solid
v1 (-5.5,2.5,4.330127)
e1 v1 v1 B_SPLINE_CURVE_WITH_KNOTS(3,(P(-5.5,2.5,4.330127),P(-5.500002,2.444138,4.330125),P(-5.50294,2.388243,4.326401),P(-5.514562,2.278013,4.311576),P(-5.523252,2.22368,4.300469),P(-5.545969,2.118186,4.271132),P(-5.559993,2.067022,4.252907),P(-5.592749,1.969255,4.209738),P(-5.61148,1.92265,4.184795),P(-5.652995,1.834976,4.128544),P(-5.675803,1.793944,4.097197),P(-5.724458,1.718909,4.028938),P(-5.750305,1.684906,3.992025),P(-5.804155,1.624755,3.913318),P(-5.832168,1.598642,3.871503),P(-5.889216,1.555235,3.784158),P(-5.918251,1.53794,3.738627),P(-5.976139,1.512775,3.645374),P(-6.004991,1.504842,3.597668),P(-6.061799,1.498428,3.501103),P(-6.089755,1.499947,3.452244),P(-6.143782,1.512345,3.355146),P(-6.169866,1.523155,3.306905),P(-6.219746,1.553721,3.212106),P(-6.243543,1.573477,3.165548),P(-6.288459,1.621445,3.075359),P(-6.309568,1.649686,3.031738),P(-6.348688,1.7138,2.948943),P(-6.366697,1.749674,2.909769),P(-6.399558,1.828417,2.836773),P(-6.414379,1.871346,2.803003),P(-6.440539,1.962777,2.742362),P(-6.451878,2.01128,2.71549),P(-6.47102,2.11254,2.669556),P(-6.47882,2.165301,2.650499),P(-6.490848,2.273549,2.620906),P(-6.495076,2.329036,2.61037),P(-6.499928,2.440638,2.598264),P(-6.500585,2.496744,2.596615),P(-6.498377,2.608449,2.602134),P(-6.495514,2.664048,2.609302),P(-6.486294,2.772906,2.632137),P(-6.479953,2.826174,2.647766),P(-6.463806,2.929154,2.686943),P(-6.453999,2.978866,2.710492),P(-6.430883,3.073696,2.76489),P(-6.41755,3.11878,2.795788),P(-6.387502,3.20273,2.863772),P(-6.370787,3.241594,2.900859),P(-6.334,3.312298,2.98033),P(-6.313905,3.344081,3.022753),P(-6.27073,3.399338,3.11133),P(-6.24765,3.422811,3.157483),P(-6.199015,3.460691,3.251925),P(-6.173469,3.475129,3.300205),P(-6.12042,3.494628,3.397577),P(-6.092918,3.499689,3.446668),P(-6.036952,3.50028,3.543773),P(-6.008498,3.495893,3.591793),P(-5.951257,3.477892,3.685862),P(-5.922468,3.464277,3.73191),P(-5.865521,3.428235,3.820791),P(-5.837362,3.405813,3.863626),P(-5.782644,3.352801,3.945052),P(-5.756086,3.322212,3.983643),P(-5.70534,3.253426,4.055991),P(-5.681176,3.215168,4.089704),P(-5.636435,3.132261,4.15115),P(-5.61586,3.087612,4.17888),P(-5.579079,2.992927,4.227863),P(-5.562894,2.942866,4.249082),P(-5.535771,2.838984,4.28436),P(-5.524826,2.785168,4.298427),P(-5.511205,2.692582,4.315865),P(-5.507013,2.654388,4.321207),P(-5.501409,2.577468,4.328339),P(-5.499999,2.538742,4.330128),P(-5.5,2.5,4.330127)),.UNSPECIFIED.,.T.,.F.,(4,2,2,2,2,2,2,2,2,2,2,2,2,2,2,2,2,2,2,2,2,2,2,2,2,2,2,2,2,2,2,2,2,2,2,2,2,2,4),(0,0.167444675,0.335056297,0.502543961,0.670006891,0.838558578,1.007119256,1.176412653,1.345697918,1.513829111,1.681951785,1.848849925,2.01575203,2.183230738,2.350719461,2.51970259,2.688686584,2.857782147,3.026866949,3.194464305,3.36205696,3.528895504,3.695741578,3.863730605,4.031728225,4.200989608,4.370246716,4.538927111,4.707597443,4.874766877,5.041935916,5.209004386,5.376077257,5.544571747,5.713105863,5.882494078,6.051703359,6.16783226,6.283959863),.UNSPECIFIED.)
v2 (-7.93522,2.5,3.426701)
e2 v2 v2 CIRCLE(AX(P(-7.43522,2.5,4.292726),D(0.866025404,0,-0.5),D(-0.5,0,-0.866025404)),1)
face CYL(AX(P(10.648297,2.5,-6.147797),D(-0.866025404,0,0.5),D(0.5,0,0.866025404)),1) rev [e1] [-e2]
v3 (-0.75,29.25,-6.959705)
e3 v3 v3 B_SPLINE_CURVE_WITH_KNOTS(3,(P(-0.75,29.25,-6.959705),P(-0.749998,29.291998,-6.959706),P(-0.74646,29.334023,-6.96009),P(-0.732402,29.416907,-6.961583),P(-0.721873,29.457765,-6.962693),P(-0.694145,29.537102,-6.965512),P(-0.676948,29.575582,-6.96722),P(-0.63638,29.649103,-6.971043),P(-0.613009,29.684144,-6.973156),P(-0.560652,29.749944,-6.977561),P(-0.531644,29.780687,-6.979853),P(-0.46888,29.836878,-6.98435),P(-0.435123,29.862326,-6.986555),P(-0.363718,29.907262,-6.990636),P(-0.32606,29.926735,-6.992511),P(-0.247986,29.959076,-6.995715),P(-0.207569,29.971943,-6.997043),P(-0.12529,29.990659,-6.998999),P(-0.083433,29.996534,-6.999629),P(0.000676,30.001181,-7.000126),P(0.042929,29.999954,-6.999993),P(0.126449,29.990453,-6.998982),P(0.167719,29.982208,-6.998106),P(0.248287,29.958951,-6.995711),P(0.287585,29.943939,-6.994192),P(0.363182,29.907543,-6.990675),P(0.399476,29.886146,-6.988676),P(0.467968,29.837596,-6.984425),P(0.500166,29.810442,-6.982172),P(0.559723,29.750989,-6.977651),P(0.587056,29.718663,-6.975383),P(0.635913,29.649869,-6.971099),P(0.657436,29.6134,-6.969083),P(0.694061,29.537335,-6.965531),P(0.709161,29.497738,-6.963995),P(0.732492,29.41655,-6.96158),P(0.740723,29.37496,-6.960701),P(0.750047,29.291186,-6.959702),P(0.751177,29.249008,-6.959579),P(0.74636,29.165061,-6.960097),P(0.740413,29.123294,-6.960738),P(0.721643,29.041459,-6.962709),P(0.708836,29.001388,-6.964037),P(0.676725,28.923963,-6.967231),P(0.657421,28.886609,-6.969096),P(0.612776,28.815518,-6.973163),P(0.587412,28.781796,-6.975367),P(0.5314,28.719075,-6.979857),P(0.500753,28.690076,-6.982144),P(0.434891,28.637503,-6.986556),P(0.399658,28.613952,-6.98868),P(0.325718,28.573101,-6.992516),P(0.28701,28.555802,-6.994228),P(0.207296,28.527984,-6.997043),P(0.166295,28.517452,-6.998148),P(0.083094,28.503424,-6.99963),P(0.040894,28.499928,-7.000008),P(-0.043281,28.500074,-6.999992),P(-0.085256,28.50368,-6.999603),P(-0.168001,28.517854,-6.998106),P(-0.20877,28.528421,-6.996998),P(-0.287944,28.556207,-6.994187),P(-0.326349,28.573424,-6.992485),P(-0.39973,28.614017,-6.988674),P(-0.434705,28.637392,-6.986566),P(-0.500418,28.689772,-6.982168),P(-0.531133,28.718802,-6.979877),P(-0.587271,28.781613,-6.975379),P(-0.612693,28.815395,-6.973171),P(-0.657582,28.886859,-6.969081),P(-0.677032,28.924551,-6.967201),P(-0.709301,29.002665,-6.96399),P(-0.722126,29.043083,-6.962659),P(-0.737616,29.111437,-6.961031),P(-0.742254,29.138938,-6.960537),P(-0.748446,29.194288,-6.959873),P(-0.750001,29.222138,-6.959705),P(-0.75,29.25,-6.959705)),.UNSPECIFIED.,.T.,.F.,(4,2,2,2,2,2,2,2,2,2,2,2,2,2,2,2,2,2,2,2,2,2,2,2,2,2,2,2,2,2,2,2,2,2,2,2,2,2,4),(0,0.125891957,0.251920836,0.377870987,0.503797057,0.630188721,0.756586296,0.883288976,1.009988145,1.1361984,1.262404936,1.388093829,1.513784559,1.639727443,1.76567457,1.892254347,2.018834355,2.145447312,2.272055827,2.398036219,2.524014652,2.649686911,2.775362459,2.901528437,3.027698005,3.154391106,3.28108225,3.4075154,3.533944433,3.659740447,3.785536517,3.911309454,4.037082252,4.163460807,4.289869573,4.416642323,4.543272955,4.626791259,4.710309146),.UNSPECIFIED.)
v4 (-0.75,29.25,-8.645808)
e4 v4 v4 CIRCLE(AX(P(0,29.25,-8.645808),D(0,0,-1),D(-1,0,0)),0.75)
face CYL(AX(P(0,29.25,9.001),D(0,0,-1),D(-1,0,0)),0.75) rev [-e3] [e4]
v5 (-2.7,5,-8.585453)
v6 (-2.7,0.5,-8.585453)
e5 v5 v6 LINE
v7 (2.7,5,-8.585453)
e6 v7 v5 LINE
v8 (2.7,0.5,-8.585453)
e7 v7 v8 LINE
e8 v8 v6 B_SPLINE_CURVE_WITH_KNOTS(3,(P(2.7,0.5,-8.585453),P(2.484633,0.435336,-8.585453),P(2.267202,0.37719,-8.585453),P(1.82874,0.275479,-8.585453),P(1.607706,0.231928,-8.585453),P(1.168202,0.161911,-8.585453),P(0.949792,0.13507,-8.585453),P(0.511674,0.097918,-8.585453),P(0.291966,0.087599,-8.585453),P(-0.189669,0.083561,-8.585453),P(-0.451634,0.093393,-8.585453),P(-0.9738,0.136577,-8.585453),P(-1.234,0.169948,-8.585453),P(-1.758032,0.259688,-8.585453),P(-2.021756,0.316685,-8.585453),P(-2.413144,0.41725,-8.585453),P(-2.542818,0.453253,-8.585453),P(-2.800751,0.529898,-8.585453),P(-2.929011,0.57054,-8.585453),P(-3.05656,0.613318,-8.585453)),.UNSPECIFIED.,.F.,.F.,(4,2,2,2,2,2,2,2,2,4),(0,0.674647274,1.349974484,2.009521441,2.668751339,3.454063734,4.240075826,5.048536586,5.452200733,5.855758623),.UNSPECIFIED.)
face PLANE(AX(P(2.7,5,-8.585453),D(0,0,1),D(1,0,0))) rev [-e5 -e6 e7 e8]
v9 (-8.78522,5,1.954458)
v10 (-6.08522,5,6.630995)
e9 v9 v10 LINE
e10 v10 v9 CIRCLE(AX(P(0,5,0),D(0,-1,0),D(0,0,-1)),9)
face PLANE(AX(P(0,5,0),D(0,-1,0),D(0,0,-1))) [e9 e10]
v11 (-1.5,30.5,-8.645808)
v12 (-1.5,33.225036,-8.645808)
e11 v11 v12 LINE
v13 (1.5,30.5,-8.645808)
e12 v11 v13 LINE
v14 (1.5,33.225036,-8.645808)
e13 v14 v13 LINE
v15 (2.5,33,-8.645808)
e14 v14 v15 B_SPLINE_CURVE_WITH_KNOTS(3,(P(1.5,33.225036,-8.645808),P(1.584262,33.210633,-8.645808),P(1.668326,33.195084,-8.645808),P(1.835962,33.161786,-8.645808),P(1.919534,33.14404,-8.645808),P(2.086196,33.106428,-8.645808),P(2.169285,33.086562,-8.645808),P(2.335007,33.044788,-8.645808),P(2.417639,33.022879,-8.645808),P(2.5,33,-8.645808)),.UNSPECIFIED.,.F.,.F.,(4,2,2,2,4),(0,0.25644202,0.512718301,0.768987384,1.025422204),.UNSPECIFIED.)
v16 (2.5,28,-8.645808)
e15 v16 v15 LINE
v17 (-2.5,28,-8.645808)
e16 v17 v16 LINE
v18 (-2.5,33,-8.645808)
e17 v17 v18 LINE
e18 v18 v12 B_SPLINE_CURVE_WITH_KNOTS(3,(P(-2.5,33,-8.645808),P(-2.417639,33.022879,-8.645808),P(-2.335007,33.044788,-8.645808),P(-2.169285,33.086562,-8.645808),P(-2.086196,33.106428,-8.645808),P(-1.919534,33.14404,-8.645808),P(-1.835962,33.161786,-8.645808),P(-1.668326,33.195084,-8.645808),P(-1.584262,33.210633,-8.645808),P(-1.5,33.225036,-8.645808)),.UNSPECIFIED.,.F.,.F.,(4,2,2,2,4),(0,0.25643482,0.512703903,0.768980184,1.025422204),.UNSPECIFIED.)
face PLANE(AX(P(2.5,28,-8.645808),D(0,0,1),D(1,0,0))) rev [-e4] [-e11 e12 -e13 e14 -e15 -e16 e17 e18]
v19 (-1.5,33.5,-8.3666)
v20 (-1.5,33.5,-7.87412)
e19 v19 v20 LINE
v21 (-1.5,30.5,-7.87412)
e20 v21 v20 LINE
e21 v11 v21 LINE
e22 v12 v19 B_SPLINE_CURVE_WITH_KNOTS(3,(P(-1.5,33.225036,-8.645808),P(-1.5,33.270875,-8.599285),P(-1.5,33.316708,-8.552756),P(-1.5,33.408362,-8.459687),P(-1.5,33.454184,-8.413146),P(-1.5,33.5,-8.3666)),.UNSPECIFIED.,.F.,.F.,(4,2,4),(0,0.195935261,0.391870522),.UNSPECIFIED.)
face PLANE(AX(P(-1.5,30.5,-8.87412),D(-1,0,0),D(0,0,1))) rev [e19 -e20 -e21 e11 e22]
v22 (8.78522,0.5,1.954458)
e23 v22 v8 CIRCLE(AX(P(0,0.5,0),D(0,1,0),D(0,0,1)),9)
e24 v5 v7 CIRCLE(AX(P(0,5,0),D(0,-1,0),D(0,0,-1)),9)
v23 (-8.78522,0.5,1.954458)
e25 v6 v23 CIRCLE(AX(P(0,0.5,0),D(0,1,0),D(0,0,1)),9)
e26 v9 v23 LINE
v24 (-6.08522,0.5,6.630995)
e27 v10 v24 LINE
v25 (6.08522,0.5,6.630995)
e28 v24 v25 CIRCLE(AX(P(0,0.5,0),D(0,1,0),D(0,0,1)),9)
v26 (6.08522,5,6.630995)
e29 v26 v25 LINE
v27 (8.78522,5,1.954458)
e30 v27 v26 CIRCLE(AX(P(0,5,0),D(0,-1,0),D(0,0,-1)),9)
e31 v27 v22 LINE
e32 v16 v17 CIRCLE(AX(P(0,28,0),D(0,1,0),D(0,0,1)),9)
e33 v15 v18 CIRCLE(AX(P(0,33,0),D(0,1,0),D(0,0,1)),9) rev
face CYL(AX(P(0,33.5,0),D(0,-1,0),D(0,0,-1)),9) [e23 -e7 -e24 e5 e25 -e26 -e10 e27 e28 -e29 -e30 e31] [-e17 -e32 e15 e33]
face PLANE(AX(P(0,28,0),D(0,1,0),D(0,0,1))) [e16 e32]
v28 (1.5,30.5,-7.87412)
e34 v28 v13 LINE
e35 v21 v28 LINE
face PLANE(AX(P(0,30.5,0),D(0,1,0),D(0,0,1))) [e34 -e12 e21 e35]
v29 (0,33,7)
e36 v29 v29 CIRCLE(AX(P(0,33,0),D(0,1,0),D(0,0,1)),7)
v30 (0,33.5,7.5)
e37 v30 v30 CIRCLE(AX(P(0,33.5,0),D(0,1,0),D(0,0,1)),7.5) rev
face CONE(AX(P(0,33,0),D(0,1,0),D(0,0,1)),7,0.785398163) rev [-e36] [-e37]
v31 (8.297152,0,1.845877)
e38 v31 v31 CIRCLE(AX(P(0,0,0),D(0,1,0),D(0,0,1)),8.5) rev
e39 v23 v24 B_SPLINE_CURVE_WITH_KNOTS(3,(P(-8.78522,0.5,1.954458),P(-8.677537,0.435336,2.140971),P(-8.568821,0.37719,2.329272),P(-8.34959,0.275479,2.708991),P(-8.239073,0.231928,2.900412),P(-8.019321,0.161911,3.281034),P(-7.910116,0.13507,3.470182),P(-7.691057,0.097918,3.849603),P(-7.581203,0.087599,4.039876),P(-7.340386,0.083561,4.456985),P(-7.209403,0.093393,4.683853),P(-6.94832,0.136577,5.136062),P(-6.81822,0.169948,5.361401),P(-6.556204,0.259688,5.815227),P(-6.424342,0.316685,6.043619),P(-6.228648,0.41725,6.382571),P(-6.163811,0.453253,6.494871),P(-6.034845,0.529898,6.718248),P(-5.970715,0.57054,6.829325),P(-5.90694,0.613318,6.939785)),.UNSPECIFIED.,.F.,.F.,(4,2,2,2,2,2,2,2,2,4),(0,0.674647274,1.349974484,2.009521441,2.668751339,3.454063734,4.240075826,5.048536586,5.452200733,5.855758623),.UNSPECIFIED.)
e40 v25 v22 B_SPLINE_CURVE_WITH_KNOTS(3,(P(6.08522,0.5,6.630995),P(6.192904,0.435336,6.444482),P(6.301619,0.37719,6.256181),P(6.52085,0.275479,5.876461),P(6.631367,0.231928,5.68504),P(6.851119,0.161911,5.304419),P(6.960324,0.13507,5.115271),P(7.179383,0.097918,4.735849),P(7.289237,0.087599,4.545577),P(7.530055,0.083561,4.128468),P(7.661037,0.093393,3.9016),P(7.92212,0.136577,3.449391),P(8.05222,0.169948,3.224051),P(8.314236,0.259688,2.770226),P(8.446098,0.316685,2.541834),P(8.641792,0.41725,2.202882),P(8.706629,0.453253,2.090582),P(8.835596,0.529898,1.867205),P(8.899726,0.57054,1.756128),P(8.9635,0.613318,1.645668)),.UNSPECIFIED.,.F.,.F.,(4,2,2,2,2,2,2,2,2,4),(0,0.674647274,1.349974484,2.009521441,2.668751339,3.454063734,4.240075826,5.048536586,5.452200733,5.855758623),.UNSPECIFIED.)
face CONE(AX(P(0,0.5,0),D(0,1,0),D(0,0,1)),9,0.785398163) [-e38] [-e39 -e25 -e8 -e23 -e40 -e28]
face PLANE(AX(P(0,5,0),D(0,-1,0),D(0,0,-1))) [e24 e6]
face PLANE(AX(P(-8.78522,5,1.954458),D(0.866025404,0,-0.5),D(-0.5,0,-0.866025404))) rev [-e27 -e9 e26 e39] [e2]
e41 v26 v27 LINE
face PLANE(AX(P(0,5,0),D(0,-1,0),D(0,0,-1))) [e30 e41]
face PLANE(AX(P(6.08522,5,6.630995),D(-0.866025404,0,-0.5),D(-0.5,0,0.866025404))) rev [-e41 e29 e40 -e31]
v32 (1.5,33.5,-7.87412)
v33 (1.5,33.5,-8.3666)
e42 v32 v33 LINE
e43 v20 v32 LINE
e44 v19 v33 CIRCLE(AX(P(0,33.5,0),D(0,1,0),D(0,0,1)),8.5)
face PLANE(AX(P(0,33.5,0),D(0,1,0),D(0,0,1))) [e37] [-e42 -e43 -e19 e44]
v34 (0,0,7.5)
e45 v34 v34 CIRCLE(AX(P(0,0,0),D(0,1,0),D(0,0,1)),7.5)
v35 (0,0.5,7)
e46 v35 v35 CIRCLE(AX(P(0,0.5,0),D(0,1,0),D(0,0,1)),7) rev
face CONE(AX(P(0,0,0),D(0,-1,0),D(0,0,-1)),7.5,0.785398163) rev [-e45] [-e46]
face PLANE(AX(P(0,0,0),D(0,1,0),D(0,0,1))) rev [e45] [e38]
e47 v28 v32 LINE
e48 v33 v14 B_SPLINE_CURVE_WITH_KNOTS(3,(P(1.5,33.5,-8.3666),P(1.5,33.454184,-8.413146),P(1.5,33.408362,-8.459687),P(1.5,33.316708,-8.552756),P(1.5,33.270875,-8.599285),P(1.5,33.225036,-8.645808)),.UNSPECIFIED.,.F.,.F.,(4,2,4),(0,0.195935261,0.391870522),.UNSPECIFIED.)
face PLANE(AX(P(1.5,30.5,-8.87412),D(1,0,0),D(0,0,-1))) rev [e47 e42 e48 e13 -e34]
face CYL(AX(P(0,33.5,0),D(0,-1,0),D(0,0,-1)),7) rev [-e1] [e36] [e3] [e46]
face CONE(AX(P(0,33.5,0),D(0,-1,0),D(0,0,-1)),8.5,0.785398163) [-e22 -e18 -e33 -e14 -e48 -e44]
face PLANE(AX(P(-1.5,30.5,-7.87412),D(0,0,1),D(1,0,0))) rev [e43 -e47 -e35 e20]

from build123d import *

# Parameters (mm, degrees)
ESQUISSE1_R                  = 9
ESQUISSE1_R_2                = 7
BOSS_EXTRU_1_DEPTH           = 33.5
ENL_V_MAT_EXTRU_1_DEPTH      = 5
ESQUISSE3_R                  = 1
ENL_V_MAT_EXTRU_2_DEPTH      = 1.65725
ENL_V_START                  = -3
ENL_V_MAT_EXTRU_6_DEPTH      = 3
ENL_V_START_2                = -5.5
ENL_V_MAT_EXTRU_3_DEPTH      = 5.5
ENL_V_MAT_EXTRU_4_REACH      = 40.918
ENL_V_MAT_EXTRU_4_END_RADIUS = 7
ESQUISSE5_R                  = 0.75
CHANFREIN2_SIZE              = 0.5


with BuildPart() as part:
    # Esquisse1 → Boss.-Extru.1 (new body)
    with BuildSketch(Plane(origin=(0, 0, 0), x_dir=(1, 0, 0), z_dir=(0, 1, 0))):
        with Locations(Location((0, 0, 0), (0, 0, 270))):
            Circle(ESQUISSE1_R)
        with Locations(Location((0, 0, 0), (0, 0, 270))):
            Circle(ESQUISSE1_R_2, mode=Mode.SUBTRACT)
    extrude(amount=BOSS_EXTRU_1_DEPTH)

    # Esquisse2 → Enlèv. mat.-Extru.1 (cut)
    with BuildSketch(Plane.XZ):
        with BuildLine():
            Line((2.7, -8.585452813), (-2.7, -8.585452813))
            ThreePointArc((-2.7, -8.585452813), (0, -9), (2.7, -8.585452813))
        make_face()
        with BuildLine():
            Line((-8.785220239, 1.954457816), (-6.085220239, 6.630994997))
            ThreePointArc((-6.085220239, 6.630994997), (-7.794228634, 4.5), (-8.785220239, 1.954457816))
        make_face()
        with BuildLine():
            Line((6.085220239, 6.630994997), (8.785220239, 1.954457816))
            ThreePointArc((8.785220239, 1.954457816), (7.794228634, 4.5), (6.085220239, 6.630994997))
        make_face()
    extrude(amount=-ENL_V_MAT_EXTRU_1_DEPTH, mode=Mode.SUBTRACT)

    # Esquisse3 → Enlèv. mat.-Extru.2 (cut)
    with BuildSketch(Plane(origin=(-7.435220239, 0, 4.292726406), x_dir=(-0.49999999999999967, 0, -0.8660254037844389), z_dir=(0.8660254037844389, 0, -0.49999999999999967))):
        with Locations(Location((0, 2.5, 0), (0, 0, 180))):
            Circle(ESQUISSE3_R)
    extrude(amount=ENL_V_MAT_EXTRU_2_DEPTH, mode=Mode.SUBTRACT)

    # Esquisse8 → Enlèv. mat.-Extru.6 (cut)
    with BuildSketch(Plane(origin=(0, 33.5, 0), x_dir=(1, 0, 0), z_dir=(0, 1, 0)).offset(ENL_V_START)):
        with BuildLine():
            Line((-1.5, 8.874119675), (-1.5, 7.874119675))
            Line((-1.5, 7.874119675), (1.5, 7.874119675))
            Line((1.5, 7.874119675), (1.5, 8.874119675))
            ThreePointArc((1.5, 8.874119675), (0, 9), (-1.5, 8.874119675))
        make_face()
    extrude(amount=ENL_V_MAT_EXTRU_6_DEPTH, mode=Mode.SUBTRACT)

    # Esquisse4 → Enlèv. mat.-Extru.3 (cut)
    with BuildSketch(Plane(origin=(0, 33.5, 0), x_dir=(1, 0, 0), z_dir=(0, 1, 0)).offset(ENL_V_START_2)):
        with BuildLine():
            Line((2.5, 8.645808233), (-2.5, 8.645808233))
            ThreePointArc((-2.5, 8.645808233), (0, 9), (2.5, 8.645808233))
        make_face()
    extrude(amount=ENL_V_MAT_EXTRU_3_DEPTH, mode=Mode.SUBTRACT)

    # Enlèv. mat.-Extru.4: up to this cylinder (the profile starts outside it)
    enl_v_mat_extru_4_end = Plane(origin=(0, 29.25, 0), z_dir=(0, -1, 0)) * Cylinder(ENL_V_MAT_EXTRU_4_END_RADIUS, 96.836, mode=Mode.PRIVATE)
    # Esquisse5 → Enlèv. mat.-Extru.4 (cut, up to the surface)
    with BuildSketch(Plane(origin=(0, 0, -8.645808233), x_dir=(-1, 0, 0), z_dir=(0, 0, -1)), mode=Mode.PRIVATE) as enl_v_mat_extru_4_sk1:
        with Locations((0, 29.25)):
            Circle(ESQUISSE5_R)
    enl_v_mat_extru_4_tool1 = extrude(enl_v_mat_extru_4_sk1.sketch, amount=-ENL_V_MAT_EXTRU_4_REACH, mode=Mode.PRIVATE) - enl_v_mat_extru_4_end
    add(enl_v_mat_extru_4_tool1.solids().sort_by_distance((0, 29.25, -8.645808))[0], mode=Mode.SUBTRACT)

    # Chanfrein1: read off the stored shape, not the designer's step
    # Chanfrein1 outline → Chanfrein1 (revolve, cut)
    with BuildSketch(Plane.XY):
        Polygon((7, 33.5), (7, 33), (7.5, 33.5), align=None)
        Polygon((9.000000072, 33.5), (8.5, 33.5), (9, 33), align=None)
        Polygon((9.000000072, 0), (9.000000072, 0.500000072), (8.5, 0), align=None)
    revolve(axis=Axis((0, 0, 0), (0, 1, 0)), mode=Mode.SUBTRACT)

    # Chanfrein2
    chanfrein2_edges = [part.edges().sort_by_distance(p)[0] for p in [
        (0, 0, -7),
    ]]
    chamfer(chanfrein2_edges, length=CHANFREIN2_SIZE)


solid = part.part
